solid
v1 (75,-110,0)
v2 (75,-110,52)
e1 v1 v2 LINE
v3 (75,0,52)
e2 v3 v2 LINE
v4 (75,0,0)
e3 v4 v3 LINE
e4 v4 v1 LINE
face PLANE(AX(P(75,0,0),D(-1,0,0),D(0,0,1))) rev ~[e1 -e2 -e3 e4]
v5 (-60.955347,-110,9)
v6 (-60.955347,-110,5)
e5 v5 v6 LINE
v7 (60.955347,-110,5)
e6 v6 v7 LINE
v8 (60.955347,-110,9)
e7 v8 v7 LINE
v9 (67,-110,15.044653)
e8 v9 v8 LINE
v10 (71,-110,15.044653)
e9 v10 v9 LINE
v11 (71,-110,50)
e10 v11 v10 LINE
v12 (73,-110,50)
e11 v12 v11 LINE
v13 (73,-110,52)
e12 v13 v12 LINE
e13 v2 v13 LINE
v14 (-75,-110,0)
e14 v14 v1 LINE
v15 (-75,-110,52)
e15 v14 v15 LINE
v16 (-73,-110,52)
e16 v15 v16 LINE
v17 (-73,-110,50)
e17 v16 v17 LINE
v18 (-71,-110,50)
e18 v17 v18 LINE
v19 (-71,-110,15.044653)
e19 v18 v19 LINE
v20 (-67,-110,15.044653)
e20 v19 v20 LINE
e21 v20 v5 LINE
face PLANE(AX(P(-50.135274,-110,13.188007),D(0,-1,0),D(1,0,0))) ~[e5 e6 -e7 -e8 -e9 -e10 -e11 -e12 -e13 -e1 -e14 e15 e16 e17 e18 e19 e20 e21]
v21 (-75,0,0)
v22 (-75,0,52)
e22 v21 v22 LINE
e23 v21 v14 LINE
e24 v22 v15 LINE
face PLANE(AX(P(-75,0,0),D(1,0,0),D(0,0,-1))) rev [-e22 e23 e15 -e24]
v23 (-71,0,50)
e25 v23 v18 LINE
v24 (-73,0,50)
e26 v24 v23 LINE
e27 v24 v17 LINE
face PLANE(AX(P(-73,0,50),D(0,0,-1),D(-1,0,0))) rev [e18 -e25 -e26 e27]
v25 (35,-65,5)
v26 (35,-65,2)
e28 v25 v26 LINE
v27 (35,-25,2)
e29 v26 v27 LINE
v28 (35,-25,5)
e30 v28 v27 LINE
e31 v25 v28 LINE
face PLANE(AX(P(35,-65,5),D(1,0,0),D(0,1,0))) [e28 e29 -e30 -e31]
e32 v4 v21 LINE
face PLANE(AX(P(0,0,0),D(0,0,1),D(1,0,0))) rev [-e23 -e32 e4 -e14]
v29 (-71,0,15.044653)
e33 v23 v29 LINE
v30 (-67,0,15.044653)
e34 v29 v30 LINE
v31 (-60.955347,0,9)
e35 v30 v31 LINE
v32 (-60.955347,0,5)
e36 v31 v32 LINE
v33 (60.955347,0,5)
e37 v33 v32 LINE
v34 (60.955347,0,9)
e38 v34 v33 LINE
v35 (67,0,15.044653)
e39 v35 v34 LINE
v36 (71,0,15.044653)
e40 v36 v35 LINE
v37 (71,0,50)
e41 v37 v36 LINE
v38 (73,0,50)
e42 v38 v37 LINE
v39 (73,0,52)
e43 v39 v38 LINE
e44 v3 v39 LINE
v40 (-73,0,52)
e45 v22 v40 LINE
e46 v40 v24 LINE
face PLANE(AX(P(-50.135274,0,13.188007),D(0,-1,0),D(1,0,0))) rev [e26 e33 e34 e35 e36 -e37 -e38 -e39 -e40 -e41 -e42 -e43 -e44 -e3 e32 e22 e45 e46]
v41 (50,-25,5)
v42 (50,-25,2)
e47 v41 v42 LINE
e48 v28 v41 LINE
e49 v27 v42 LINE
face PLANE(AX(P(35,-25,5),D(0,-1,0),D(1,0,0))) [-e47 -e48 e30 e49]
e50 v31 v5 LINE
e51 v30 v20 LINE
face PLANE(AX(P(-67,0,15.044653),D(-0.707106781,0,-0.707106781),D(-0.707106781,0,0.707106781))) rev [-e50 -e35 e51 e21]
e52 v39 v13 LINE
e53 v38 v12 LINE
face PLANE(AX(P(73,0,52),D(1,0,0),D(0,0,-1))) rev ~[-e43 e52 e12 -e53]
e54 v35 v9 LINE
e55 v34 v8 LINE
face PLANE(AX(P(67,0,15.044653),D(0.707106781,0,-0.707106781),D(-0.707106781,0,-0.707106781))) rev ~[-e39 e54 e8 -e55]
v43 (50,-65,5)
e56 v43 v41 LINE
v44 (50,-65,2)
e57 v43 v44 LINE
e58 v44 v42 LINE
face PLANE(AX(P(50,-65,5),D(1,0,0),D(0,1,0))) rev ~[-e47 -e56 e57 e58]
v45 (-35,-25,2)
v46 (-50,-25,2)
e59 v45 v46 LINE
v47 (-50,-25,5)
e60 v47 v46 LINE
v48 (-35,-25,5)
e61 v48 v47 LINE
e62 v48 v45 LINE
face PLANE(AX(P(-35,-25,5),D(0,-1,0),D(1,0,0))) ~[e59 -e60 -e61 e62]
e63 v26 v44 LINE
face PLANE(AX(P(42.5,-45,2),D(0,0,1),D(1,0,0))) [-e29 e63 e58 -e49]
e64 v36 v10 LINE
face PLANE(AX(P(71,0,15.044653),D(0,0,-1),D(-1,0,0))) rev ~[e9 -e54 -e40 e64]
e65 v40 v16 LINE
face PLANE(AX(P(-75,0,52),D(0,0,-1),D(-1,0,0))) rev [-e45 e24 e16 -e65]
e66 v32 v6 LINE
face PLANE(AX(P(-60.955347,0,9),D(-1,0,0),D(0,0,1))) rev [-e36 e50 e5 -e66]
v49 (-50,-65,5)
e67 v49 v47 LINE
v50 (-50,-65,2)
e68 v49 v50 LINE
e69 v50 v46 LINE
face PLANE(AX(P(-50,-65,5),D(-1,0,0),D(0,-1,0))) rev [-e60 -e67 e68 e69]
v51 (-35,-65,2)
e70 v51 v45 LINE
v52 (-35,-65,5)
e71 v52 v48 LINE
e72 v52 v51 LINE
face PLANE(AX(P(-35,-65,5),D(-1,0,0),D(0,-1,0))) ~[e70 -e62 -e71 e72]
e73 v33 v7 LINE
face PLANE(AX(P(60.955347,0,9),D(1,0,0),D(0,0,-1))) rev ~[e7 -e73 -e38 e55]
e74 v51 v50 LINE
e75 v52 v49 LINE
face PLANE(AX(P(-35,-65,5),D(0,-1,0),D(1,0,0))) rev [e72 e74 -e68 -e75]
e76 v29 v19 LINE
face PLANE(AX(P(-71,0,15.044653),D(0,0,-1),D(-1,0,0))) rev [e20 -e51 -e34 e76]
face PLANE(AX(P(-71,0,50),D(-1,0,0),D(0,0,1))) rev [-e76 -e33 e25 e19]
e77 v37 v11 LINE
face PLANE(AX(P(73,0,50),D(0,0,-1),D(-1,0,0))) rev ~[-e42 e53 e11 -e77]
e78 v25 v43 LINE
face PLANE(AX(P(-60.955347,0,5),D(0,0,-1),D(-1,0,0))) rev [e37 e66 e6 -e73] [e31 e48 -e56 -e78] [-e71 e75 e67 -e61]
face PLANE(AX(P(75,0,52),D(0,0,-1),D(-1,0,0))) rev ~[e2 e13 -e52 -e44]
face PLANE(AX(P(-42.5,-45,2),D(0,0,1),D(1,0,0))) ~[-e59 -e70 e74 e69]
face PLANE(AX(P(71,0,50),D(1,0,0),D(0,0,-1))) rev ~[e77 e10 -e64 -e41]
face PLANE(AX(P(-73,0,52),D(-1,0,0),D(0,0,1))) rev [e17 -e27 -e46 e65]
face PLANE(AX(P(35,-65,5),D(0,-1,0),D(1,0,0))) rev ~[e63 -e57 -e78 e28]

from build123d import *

# Parameters (mm, degrees)
F1_DEPTH = 110
F2_W     = 15
F2_H     = 40
F3_DEPTH = 3


# Not quite as in the source:
# - a feature names something its author has since deleted; it is built from what else it names


with BuildPart() as f1:
    # F0 (on Front) → F1 (new body)
    with BuildSketch(Plane.XZ):
        Polygon((0, 5), (0, 0), (75, 0), (75, 52), (73, 52), (73, 50), (71, 50), (71, 15.0446529165), (67, 15.0446529165), (60.9553470835, 9), (60.9553470835, 5), align=None)
    extrude(amount=F1_DEPTH)

    # F2 (on face) → F3 (cut)
    with BuildSketch(Plane.XY.offset(5)):
        with Locations((42.5, -45)):
            Rectangle(F2_W, F2_H)
    extrude(amount=-F3_DEPTH, mode=Mode.SUBTRACT)

    # F4: F1 across plane


with BuildPart() as f1_1:
    add(f1.part)
    add(f1.part.mirror(Plane.YZ))


solid = f1_1.part
